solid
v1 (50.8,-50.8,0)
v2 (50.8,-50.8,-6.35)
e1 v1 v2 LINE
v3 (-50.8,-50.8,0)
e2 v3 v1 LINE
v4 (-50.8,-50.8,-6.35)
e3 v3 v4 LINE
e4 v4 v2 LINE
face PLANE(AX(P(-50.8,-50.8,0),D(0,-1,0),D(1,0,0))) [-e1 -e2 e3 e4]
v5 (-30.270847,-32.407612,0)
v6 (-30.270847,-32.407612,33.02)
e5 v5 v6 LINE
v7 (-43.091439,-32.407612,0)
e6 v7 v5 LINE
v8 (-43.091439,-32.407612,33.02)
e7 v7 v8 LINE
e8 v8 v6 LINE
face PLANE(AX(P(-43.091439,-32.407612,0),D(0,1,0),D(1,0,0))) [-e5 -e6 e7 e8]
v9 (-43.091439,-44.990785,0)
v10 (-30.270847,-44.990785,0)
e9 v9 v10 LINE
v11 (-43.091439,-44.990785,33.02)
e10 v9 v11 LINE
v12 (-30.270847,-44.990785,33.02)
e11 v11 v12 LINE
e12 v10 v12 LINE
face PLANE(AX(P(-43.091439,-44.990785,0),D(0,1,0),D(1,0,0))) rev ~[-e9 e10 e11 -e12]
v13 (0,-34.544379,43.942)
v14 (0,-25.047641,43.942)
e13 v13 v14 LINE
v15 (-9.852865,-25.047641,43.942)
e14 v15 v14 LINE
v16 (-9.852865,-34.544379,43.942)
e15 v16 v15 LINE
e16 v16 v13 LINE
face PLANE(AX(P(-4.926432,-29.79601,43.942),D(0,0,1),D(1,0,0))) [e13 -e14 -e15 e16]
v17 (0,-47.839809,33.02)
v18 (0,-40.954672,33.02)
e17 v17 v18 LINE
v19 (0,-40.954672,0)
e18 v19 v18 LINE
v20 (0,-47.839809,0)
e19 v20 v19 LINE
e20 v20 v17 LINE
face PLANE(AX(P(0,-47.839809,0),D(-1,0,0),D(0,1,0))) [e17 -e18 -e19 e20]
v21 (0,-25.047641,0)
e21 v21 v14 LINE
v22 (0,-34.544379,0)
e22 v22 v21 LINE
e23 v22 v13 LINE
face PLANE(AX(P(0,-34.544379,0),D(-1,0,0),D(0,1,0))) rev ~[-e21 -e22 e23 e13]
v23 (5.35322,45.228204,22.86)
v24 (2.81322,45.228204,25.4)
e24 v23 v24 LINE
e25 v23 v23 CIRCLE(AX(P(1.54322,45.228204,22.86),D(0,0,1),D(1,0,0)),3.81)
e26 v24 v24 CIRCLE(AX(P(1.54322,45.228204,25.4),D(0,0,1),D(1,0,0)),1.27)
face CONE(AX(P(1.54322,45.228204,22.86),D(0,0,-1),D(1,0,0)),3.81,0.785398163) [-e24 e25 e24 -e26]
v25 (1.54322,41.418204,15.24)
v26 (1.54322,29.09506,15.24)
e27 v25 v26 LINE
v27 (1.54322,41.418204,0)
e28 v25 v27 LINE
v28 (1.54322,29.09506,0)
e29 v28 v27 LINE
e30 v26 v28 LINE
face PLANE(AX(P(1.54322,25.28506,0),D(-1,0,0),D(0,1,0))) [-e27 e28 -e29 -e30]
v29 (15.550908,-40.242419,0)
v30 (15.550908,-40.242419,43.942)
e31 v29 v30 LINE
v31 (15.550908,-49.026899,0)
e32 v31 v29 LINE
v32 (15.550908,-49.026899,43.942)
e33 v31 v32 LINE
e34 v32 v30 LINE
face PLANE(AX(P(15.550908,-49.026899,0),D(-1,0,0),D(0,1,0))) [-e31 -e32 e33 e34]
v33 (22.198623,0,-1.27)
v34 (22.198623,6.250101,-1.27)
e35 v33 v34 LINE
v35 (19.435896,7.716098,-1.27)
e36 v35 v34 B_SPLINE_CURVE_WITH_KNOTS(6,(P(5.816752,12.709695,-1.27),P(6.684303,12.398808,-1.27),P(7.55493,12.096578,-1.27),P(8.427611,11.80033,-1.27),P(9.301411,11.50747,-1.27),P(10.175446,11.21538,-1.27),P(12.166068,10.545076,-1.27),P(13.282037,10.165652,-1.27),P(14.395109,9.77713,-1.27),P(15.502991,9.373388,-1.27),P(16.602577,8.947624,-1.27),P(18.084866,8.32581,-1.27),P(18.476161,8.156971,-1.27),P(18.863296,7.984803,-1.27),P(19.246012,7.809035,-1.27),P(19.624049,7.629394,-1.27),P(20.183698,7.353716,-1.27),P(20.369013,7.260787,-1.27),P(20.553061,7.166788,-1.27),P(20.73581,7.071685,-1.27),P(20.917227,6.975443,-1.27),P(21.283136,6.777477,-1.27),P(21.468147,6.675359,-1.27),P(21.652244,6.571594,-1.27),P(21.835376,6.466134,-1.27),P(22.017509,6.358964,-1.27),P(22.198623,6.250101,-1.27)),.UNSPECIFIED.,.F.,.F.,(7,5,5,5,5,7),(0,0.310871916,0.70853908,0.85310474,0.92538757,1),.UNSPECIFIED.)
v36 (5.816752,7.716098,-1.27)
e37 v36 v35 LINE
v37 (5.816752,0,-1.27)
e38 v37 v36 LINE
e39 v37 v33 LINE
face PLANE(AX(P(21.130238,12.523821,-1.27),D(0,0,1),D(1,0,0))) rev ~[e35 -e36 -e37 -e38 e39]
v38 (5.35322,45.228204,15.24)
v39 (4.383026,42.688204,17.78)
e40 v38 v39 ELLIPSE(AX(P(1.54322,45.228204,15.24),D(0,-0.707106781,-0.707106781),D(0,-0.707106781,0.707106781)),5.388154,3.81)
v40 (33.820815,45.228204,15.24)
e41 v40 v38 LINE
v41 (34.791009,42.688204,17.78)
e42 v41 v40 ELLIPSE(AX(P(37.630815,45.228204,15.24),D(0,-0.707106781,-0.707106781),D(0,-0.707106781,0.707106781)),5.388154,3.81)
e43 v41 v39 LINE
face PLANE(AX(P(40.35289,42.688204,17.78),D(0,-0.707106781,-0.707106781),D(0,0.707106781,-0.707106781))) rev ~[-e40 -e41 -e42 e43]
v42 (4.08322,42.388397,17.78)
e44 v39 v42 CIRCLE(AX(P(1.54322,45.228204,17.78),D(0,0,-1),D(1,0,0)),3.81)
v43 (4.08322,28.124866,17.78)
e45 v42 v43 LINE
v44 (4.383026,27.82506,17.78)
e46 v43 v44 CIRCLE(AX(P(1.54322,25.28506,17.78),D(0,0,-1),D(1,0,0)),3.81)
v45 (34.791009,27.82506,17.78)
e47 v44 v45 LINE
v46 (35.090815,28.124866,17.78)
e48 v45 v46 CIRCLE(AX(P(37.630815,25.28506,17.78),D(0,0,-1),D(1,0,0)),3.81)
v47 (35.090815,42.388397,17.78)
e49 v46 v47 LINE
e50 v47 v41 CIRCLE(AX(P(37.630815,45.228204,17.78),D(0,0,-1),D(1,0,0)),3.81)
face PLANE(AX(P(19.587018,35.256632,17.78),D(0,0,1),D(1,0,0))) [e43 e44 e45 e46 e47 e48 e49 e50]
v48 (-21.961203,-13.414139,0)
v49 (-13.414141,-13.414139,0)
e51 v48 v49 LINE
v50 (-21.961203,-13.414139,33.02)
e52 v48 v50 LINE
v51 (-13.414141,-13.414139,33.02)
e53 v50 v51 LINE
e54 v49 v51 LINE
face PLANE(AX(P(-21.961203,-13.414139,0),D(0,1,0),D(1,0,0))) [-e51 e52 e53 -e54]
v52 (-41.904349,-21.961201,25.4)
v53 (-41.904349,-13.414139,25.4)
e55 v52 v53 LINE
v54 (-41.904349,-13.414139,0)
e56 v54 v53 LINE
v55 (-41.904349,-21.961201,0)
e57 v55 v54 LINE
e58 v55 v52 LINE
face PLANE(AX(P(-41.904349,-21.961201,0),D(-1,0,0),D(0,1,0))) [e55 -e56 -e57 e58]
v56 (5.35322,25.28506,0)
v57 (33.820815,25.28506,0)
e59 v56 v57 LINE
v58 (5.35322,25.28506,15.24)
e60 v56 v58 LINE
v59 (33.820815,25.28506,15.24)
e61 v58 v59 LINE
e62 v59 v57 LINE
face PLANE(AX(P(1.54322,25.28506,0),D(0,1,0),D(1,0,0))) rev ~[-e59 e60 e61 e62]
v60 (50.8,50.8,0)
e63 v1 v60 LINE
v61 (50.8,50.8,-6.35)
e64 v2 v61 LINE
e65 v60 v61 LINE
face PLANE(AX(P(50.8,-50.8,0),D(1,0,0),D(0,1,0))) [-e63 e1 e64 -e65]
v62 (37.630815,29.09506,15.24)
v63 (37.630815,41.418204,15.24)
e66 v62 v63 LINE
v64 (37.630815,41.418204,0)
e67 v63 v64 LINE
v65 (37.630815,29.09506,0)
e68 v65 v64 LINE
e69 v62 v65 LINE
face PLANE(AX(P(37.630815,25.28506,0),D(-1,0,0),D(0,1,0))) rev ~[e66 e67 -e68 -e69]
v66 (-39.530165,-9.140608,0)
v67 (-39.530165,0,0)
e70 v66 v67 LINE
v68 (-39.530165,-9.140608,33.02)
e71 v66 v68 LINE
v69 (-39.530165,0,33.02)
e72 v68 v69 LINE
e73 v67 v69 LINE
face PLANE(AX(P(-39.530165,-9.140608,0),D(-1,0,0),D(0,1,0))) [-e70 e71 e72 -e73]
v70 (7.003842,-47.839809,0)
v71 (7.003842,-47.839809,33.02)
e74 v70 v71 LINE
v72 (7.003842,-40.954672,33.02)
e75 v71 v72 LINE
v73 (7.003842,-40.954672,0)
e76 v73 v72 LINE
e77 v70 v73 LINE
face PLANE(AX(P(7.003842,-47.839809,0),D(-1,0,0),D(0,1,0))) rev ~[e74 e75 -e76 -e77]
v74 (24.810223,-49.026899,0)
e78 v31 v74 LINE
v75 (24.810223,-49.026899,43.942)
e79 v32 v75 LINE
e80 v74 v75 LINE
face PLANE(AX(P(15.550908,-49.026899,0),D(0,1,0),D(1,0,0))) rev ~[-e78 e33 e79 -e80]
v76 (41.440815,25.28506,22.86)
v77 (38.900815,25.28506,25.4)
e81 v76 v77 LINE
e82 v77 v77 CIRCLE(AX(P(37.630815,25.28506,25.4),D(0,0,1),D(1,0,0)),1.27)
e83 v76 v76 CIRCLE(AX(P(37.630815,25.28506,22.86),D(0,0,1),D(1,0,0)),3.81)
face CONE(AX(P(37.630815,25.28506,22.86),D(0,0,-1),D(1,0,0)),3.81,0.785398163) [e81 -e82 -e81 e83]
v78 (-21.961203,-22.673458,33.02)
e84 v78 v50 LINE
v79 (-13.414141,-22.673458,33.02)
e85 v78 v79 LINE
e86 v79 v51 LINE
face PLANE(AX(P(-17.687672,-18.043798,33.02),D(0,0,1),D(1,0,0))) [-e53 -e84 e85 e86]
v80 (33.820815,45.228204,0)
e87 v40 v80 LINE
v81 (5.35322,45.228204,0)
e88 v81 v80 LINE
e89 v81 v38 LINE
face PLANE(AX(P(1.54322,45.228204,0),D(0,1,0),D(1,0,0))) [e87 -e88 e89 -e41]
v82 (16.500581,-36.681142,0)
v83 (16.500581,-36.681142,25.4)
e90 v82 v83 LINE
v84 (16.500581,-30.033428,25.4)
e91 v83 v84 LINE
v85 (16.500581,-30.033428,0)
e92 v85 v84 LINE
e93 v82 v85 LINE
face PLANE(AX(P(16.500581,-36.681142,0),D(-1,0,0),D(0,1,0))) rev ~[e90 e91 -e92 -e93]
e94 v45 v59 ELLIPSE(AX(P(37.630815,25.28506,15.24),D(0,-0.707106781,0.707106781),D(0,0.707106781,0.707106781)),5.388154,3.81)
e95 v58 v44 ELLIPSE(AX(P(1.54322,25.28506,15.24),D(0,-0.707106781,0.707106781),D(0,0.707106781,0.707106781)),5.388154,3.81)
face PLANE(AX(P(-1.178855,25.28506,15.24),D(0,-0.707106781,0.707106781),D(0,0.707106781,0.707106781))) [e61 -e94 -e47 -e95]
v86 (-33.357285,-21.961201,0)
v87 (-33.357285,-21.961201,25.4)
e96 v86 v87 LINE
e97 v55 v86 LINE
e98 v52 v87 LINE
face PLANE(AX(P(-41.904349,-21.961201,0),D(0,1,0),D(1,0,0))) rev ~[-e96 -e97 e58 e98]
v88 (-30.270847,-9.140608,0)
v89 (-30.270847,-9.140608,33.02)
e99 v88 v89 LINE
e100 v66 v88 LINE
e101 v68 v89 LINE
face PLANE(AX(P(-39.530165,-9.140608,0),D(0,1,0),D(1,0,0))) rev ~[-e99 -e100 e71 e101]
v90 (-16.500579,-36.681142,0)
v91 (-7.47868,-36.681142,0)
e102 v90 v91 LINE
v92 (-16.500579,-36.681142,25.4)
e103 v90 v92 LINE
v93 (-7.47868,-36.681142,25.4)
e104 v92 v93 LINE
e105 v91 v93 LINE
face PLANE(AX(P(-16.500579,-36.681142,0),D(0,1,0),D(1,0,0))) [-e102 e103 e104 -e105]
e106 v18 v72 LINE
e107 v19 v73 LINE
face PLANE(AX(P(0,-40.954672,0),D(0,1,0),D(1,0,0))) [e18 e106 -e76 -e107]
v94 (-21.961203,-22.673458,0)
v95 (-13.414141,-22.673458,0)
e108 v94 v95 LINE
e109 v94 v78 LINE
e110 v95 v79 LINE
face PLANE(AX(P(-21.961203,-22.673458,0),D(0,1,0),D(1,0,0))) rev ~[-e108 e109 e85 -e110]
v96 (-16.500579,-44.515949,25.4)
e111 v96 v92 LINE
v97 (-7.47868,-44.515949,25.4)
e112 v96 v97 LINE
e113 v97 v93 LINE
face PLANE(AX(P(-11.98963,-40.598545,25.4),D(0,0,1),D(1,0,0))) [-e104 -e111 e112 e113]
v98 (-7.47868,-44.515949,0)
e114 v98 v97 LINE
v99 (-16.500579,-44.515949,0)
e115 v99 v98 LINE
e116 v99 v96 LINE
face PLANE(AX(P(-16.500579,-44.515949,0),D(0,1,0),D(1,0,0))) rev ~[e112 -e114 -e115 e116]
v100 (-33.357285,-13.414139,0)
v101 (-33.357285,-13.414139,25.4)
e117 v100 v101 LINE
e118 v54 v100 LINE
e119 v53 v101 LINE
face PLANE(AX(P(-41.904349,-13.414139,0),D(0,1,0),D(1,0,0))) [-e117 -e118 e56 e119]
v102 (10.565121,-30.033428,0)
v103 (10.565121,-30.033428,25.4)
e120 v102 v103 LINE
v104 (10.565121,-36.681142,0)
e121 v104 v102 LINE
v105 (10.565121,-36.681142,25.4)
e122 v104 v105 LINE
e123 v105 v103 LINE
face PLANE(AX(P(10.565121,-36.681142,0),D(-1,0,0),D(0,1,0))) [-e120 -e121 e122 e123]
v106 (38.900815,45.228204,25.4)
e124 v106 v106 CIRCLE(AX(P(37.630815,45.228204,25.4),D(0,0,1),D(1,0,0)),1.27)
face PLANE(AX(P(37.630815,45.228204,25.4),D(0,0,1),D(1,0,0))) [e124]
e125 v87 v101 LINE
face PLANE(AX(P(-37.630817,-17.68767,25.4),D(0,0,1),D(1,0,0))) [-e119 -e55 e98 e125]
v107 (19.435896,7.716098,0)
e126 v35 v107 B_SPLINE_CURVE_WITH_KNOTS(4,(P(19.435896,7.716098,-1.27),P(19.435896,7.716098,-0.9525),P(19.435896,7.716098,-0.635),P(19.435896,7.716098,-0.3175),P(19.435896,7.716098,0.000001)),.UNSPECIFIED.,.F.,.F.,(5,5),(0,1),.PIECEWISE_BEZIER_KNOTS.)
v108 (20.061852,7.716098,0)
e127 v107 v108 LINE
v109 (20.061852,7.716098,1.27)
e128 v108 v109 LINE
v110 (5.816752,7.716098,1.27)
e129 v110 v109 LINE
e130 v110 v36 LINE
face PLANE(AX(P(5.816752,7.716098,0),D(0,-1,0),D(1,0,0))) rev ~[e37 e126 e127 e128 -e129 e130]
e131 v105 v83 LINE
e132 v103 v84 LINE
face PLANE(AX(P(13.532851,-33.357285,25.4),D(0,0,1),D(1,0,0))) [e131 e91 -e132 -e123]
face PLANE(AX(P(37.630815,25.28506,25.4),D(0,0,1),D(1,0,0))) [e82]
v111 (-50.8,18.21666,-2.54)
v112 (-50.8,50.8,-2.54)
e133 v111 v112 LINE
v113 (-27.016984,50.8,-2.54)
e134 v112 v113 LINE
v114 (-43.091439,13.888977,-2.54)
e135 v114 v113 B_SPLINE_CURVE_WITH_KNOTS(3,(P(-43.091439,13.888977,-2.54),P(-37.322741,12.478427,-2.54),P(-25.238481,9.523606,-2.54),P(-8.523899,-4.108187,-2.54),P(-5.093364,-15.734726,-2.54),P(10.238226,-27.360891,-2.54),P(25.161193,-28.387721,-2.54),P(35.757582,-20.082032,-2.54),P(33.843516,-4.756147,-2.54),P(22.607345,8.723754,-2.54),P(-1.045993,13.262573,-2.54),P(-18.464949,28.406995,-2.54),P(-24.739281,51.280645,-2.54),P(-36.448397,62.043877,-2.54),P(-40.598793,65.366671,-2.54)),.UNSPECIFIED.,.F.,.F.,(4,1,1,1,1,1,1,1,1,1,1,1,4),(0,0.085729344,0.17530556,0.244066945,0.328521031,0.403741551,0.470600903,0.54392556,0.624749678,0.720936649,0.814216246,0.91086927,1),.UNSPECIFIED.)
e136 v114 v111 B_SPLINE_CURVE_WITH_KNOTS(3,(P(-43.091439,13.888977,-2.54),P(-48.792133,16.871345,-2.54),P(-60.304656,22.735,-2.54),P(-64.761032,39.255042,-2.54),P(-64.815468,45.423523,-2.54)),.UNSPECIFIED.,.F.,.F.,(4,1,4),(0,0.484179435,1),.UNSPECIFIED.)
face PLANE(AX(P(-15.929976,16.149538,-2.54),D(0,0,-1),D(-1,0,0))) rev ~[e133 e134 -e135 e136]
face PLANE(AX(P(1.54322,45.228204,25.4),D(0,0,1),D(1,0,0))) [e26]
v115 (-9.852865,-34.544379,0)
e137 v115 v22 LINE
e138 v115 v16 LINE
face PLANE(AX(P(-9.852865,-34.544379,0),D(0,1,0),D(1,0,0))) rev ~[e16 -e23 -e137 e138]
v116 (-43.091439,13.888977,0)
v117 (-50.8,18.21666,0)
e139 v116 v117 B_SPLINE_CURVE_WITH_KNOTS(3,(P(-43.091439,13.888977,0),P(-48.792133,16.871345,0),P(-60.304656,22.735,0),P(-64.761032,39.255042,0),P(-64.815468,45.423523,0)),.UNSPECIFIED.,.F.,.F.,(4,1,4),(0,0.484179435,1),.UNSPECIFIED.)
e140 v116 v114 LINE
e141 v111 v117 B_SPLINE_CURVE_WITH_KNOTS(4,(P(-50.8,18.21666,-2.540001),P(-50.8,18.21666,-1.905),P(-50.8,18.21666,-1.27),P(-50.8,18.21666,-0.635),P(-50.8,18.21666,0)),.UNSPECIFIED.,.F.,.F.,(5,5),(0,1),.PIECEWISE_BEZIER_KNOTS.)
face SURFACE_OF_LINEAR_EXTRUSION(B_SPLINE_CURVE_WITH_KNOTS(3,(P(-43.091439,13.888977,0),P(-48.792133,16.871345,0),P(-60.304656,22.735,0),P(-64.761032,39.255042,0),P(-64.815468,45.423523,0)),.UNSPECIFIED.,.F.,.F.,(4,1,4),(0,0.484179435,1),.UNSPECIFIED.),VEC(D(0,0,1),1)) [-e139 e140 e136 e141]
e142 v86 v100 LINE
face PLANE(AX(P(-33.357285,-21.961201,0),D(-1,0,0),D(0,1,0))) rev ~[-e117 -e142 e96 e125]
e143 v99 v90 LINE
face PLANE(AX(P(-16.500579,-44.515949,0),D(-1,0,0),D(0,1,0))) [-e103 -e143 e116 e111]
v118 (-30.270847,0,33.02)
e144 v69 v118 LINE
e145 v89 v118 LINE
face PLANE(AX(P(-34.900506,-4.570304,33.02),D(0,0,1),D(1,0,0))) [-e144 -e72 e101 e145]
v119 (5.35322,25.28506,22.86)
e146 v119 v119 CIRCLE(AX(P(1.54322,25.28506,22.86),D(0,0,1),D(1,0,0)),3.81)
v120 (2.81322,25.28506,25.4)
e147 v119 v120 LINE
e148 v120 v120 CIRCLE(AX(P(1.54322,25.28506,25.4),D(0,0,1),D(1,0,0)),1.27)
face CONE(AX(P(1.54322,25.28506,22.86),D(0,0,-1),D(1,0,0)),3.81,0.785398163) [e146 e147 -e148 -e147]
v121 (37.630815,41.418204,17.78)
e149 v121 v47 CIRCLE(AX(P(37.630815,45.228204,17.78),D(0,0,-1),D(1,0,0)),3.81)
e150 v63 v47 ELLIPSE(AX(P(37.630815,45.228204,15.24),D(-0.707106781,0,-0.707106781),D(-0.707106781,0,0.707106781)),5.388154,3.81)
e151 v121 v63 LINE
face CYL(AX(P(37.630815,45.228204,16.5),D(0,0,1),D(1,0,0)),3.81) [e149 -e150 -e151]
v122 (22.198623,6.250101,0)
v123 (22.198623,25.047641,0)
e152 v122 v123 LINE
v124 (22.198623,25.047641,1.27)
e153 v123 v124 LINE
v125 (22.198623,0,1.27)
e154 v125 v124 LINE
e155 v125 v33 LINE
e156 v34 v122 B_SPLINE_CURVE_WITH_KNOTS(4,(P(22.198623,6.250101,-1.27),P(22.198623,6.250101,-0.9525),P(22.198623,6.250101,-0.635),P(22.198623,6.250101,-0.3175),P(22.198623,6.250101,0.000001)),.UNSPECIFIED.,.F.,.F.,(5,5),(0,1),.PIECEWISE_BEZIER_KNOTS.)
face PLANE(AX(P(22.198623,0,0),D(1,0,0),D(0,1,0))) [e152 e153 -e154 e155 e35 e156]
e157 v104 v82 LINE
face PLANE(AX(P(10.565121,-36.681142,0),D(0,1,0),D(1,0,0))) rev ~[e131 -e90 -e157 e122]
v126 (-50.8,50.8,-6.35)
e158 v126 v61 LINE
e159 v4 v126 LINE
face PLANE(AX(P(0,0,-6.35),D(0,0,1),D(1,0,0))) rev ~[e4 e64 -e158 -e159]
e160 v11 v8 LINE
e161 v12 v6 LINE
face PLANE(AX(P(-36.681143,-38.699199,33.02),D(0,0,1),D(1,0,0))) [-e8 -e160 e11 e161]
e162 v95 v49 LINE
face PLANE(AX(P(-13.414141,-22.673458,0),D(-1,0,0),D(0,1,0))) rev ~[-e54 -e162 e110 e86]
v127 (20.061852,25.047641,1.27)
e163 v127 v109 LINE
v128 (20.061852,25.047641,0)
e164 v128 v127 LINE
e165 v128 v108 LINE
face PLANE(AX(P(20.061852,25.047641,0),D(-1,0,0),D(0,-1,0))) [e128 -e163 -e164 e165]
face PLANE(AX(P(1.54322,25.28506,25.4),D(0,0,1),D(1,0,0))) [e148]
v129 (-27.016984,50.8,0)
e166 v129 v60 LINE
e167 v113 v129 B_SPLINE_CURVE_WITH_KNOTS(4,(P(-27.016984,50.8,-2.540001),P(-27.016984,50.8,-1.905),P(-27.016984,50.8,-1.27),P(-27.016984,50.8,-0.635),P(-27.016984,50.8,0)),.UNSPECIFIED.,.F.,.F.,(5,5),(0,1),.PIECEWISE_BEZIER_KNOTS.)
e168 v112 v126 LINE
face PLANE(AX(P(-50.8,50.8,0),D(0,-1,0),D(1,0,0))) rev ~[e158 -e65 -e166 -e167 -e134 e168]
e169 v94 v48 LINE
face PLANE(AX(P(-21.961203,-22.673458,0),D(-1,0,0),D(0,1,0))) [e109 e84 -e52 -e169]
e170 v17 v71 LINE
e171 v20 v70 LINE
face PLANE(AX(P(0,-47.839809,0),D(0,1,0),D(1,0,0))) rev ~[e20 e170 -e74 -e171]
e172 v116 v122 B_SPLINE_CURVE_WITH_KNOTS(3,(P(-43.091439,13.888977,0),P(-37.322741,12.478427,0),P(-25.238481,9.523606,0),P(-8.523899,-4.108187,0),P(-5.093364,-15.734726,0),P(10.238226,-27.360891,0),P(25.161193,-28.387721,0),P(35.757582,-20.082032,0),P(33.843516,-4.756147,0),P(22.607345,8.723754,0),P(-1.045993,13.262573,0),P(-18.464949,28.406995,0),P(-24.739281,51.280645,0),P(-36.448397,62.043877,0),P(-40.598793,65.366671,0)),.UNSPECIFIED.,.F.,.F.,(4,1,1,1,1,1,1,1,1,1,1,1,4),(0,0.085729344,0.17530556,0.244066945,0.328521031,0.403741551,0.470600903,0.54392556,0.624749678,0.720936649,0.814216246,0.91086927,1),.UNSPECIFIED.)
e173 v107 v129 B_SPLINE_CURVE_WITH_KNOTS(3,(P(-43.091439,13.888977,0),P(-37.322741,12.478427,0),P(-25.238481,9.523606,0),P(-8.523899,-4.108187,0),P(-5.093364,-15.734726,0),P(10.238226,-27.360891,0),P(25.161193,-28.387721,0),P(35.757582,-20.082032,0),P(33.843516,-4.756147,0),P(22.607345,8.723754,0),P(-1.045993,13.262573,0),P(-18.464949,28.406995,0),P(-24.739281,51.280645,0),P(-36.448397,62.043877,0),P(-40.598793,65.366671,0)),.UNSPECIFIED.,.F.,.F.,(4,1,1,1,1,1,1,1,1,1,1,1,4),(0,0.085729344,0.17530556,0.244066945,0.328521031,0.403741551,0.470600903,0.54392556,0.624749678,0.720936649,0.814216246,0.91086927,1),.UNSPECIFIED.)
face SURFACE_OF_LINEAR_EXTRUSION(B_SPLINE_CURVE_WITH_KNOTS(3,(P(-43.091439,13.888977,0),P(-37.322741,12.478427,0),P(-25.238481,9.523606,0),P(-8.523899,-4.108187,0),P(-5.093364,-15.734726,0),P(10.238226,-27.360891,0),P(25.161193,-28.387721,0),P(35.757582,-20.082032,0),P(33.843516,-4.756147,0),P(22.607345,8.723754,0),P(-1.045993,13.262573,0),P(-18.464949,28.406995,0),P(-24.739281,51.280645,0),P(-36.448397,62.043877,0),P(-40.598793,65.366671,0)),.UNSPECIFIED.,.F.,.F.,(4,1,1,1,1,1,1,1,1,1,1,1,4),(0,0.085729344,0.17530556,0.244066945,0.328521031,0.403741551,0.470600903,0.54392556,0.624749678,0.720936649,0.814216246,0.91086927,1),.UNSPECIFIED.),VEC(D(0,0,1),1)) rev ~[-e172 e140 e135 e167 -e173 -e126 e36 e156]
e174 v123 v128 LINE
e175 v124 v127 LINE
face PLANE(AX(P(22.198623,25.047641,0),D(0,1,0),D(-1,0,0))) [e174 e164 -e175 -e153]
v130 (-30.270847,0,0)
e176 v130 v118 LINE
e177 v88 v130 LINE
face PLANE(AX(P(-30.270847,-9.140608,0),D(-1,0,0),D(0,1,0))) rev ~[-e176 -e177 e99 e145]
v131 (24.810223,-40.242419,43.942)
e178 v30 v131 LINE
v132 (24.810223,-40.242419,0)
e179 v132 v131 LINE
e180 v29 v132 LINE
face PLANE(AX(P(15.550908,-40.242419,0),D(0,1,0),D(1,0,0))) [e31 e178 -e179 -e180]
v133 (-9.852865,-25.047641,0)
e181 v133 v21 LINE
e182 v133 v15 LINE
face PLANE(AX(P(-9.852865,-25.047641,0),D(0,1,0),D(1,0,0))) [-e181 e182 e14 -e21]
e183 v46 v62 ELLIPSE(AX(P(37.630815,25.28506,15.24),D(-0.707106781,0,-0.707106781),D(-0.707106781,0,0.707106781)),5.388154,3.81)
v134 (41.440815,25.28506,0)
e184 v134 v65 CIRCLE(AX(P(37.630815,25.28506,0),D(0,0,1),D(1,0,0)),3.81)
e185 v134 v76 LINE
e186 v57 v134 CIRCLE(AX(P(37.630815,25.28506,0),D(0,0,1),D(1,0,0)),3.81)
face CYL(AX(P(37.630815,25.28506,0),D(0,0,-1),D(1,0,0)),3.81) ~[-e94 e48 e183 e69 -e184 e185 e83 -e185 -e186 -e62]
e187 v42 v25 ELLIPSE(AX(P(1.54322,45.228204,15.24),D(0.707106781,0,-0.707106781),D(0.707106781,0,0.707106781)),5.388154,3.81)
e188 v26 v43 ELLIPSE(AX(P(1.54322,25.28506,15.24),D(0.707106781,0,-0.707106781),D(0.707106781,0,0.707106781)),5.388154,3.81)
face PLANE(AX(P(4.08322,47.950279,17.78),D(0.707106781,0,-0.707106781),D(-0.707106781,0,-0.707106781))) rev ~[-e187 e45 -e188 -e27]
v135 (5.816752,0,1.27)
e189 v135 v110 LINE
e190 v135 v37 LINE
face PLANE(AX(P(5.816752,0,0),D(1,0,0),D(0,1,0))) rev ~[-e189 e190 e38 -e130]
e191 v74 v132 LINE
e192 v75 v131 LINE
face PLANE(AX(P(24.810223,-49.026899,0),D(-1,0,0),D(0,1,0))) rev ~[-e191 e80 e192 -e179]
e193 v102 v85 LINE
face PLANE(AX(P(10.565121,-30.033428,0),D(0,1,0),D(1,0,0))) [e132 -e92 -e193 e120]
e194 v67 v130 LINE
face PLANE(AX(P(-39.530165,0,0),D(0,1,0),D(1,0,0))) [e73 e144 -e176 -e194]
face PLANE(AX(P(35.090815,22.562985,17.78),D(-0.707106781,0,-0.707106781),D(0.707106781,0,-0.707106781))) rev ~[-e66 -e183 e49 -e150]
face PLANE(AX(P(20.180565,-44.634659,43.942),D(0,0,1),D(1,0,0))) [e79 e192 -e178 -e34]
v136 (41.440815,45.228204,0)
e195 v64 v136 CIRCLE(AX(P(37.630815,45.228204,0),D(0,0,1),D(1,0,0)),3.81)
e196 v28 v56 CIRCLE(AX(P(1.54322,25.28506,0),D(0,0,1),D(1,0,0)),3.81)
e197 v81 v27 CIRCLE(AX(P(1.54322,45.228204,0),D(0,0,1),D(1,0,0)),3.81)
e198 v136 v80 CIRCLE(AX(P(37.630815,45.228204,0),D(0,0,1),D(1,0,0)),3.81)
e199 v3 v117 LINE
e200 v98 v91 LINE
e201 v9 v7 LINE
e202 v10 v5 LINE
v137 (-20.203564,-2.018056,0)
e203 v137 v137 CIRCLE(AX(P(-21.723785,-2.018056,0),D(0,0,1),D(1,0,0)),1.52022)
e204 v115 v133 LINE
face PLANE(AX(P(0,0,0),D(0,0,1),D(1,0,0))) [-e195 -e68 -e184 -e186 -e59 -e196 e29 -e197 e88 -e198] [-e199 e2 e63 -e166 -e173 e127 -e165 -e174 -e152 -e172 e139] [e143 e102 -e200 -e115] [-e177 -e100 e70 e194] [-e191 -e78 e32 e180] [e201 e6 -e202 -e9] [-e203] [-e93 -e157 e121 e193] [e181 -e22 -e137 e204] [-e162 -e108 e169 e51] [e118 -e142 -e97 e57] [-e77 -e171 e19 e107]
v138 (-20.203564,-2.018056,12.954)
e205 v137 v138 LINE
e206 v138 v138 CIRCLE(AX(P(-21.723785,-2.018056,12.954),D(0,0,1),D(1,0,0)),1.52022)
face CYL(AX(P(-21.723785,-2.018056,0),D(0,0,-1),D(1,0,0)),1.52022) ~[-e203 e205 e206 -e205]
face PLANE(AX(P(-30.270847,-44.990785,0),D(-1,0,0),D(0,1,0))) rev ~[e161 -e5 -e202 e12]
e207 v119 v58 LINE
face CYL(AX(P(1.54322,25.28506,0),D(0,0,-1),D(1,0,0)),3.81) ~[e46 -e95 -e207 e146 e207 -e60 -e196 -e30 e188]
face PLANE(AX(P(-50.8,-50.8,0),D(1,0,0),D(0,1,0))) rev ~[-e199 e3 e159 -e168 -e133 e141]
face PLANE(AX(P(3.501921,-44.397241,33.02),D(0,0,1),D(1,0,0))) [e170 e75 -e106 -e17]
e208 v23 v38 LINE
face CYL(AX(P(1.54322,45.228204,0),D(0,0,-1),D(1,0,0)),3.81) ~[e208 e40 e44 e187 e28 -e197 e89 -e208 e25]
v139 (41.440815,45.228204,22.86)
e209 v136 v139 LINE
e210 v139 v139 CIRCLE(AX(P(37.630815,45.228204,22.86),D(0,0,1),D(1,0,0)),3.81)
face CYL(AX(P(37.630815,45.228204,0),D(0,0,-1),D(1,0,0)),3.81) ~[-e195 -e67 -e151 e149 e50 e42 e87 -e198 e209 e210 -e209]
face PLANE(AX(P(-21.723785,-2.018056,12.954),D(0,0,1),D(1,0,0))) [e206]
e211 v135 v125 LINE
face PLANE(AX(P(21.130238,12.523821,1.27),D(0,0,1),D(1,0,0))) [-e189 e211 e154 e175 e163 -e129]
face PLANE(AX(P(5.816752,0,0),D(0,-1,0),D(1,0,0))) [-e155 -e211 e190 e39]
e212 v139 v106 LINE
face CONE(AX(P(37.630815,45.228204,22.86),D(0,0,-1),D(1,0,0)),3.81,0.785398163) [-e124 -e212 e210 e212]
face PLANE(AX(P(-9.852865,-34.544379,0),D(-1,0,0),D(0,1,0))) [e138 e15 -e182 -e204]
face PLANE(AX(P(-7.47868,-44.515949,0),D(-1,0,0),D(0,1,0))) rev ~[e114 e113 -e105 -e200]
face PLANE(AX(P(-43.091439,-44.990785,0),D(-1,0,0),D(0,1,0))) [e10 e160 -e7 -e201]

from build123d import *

# Parameters (mm, degrees)
F0_W          = 101.6
F0_H          = 101.6
F1_DEPTH      = 6.35
F3_DEPTH      = 2.54
F4_W          = 8.5470639169
F4_H          = 8.5470620543
F4_W_2        = 9.0218987316
F4_H_2        = 7.8348070383
F4_W_3        = 5.9354603291
F4_H_3        = 6.6477134824
F10_DEPTH     = 25.4
F5_W          = 9.2593189329
F5_H          = 9.1406079009
F5_W_2        = 8.5470620543
F5_H_2        = 9.2593189329
F5_W_3        = 12.8205921501
F5_H_3        = 12.5831738114
F5_W_4        = 7.0038423873
F5_H_4        = 6.885137409
F11_DEPTH     = 33.02
F6_W          = 9.8528647795
F6_H          = 9.4967372715
F6_W_2        = 9.2593152076
F6_H_2        = 8.7844803929
F12_DEPTH     = 43.942
F7_R          = 1.5202204641
F13_DEPTH     = 12.954
F8_W          = 36.0875949264
F8_H          = 19.9431441724
F14_DEPTH     = 17.78
F15_R         = 3.81
F16_DEPTH     = 25.4
F17_SIZE      = 2.54
F18_T4_DEPTH  = 25.3872937513
F18_S5_R      = 3.81
F18_T6_DEPTH  = 14
F18_S7_R      = 3.81
F18_T8_DEPTH  = 14
F18_T12_DEPTH = 41.5317445052
F18_S13_R     = 3.81
F18_T14_DEPTH = 22
F18_S15_R     = 3.81
F18_T16_DEPTH = 22
F18_T20_DEPTH = 25.3872937513
F18_S21_R     = 3.81
F18_T22_DEPTH = 14
F18_S23_R     = 3.81
F18_T24_DEPTH = 14
F18_T28_DEPTH = 41.5317445052
F18_S29_R     = 3.81
F18_T30_DEPTH = 22
F18_S31_R     = 3.81
F18_T32_DEPTH = 22
F9_W          = 14.245100785
F9_H          = 7.716097869
F19_DEPTH     = 1.27


# Not quite as in the source:
# - a fillet or chamfer that OpenCascade refuses, or shapes differently, is made with other operations: its cross-section is extruded or revolved along the edge and cut away or added


with BuildPart() as f1:
    # F0 (on Top) → F1 (new body)
    with BuildSketch(Plane.XY):
        Rectangle(F0_W, F0_H)
    extrude(amount=-F1_DEPTH)

    # F2 (on Top) → F3 (cut)
    with BuildSketch(Plane.XY):
        with BuildLine():
            add(Edge.make_bspline(
                [(-43.0914387107, 13.8889765367), (-48.792132623, 16.8713450612), (-60.3046561951, 22.7349998179), (-64.7610317916, 39.255042485), (-64.8154675332, 45.423523183)],
                knots=[0, 0, 0, 0, 0.4841794351, 1, 1, 1, 1], degree=3))
            add(Edge.make_bspline(
                [(-43.0914387107, 13.8889765367), (-37.3227409256, 12.4784266372), (-25.238481151, 9.5236064613), (-8.5238992218, -4.1081865608), (-5.0933643721, -15.7347262944), (10.2382263796, -27.360890695), (25.1611930237, -28.3877213638), (35.757581674, -20.0820321549), (33.8435161562, -4.7561465103), (22.6073453238, 8.7237537482), (-1.0459930134, 13.2625730637), (-18.464949103, 28.4069952294), (-24.7392805682, 51.2806449877), (-36.4483970668, 62.0438769385), (-40.598793265, 65.3666710807)],
                knots=[0, 0, 0, 0, 0.0857293443, 0.1753055598, 0.2440669449, 0.3285210308, 0.4037415508, 0.4706009031, 0.5439255605, 0.6247496782, 0.7209366486, 0.814216246, 0.9108692703, 1, 1, 1, 1], degree=3))
            Line((-40.598793265, 65.3666710807), (-64.8154675332, 45.423523183))
        make_face()
    extrude(amount=-F3_DEPTH, mode=Mode.SUBTRACT)

    # F4 (on Top) → F10 (join)
    with BuildSketch(Plane.XY):
        with Locations((-37.6308169216, -17.6876699552)):
            Rectangle(F4_W, F4_H)
        with Locations((-11.9896298274, -40.5985452235)):
            Rectangle(F4_W_2, F4_H_2)
        with Locations((13.5328508914, -33.3572849631)):
            Rectangle(F4_W_3, F4_H_3)
    extrude(amount=F10_DEPTH)

    # F5 (on Top) → F11 (join)
    with BuildSketch(Plane.XY):
        with Locations((-34.900506027, -4.5703039505)):
            Rectangle(F5_W, F5_H)
        with Locations((-17.6876718178, -18.0437983945)):
            Rectangle(F5_W_2, F5_H_2)
        with Locations((-36.6811426356, -38.6991985142)):
            Rectangle(F5_W_3, F5_H_3)
        with Locations((3.5019211937, -44.3972405046)):
            Rectangle(F5_W_4, F5_H_4)
    extrude(amount=F11_DEPTH)

    # F6 (on Top) → F12 (join)
    with BuildSketch(Plane.XY):
        with Locations((-4.9264323898, -29.7960098833)):
            Rectangle(F6_W, F6_H)
        with Locations((20.1805653051, -44.6346588433)):
            Rectangle(F6_W_2, F6_H_2)
    extrude(amount=F12_DEPTH)

    # F7 (on Top) → F13 (join)
    with BuildSketch(Plane.XY):
        with Locations((-21.7237845063, -2.0180563442)):
            Circle(F7_R)
    extrude(amount=F13_DEPTH)

    # F8 (on Top) → F14 (join)
    with BuildSketch(Plane.XY):
        with Locations((19.5870175958, 35.2566316724)):
            Rectangle(F8_W, F8_H)
    extrude(amount=F14_DEPTH)

    # F15 (on Top) → F16 (join)
    with BuildSketch(Plane.XY):
        with Locations((1.5432201326, 45.2282037586)):
            Circle(F15_R)
        with Locations((37.6308150589, 45.2282037586)):
            Circle(F15_R)
        with Locations((37.6308150589, 25.2850595862)):
            Circle(F15_R)
        with Locations((1.5432201326, 25.2850595862)):
            Circle(F15_R)
    extrude(amount=F16_DEPTH)

    # F17
    f17_edges = [f1.edges().sort_by_distance(p)[0] for p in [
        (-2.26678, 45.228204, 25.4),
        (-2.26678, 25.28506, 25.4),
        (33.820815, 25.28506, 25.4),
        (33.820815, 45.228204, 25.4),
    ]]
    chamfer(f17_edges, length=F17_SIZE)

    # F18: chamfer of 2.54 on 4 edges, made by hand


with BuildPart() as f18_tool2:
    # F18_s3 → F18_t4 (new body)
    with BuildSketch(Plane.XZ.offset(-47.950278548)):
        Polygon((4.0832201326, 17.78), (1.5432201326, 15.24), (1.5432201326, 17.78), align=None)
    extrude(amount=F18_T4_DEPTH)

    # F18_s5 → F18_t6 (cut, symmetric)
    with BuildSketch(Plane.XY.offset(16.5)):
        with Locations((1.5432201326, 25.2850595862)):
            Circle(F18_S5_R)
    extrude(amount=F18_T6_DEPTH, both=True, mode=Mode.SUBTRACT)

    # F18_s7 → F18_t8 (cut, symmetric)
    with BuildSketch(Plane.XY.offset(16.5)):
        with Locations((1.5432201326, 45.2282037586)):
            Circle(F18_S7_R)
    extrude(amount=F18_T8_DEPTH, both=True, mode=Mode.SUBTRACT)


with BuildPart() as f1_1:
    add(f1.part)

    # F18_t1: cut F18_tool2
    add(f18_tool2.part, mode=Mode.SUBTRACT)


with BuildPart() as f18_tool10:
    # F18_s11 → F18_t12 (new body)
    with BuildSketch(Plane.YZ.offset(-1.1788546568)):
        Polygon((25.2850595862, 15.24), (27.8250595862, 17.78), (25.2850595862, 17.78), align=None)
    extrude(amount=F18_T12_DEPTH)

    # F18_s13 → F18_t14 (cut, symmetric)
    with BuildSketch(Plane.XY.offset(16.5)):
        with Locations((37.6308150589, 25.2850595862)):
            Circle(F18_S13_R)
    extrude(amount=F18_T14_DEPTH, both=True, mode=Mode.SUBTRACT)

    # F18_s15 → F18_t16 (cut, symmetric)
    with BuildSketch(Plane.XY.offset(16.5)):
        with Locations((1.5432201326, 25.2850595862)):
            Circle(F18_S15_R)
    extrude(amount=F18_T16_DEPTH, both=True, mode=Mode.SUBTRACT)


with BuildPart() as f1_2:
    add(f1_1.part)

    # F18_t9: cut F18_tool10
    add(f18_tool10.part, mode=Mode.SUBTRACT)


with BuildPart() as f18_tool18:
    # F18_s19 → F18_t20 (new body)
    with BuildSketch(Plane.XZ.offset(-22.5629847967)):
        Polygon((35.0908150589, 17.78), (37.6308150589, 15.24), (37.6308150589, 17.78), align=None)
    extrude(amount=-F18_T20_DEPTH)

    # F18_s21 → F18_t22 (cut, symmetric)
    with BuildSketch(Plane.XY.offset(16.5)):
        with Locations((37.6308150589, 25.2850595862)):
            Circle(F18_S21_R)
    extrude(amount=F18_T22_DEPTH, both=True, mode=Mode.SUBTRACT)

    # F18_s23 → F18_t24 (cut, symmetric)
    with BuildSketch(Plane.XY.offset(16.5)):
        with Locations((37.6308150589, 45.2282037586)):
            Circle(F18_S23_R)
    extrude(amount=F18_T24_DEPTH, both=True, mode=Mode.SUBTRACT)


with BuildPart() as f1_3:
    add(f1_2.part)

    # F18_t17: cut F18_tool18
    add(f18_tool18.part, mode=Mode.SUBTRACT)


with BuildPart() as f18_tool26:
    # F18_s27 → F18_t28 (new body)
    with BuildSketch(Plane.YZ.offset(40.3528898484)):
        Polygon((42.6882037586, 17.78), (45.2282037586, 15.24), (45.2282037586, 17.78), align=None)
    extrude(amount=-F18_T28_DEPTH)

    # F18_s29 → F18_t30 (cut, symmetric)
    with BuildSketch(Plane.XY.offset(16.5)):
        with Locations((1.5432201326, 45.2282037586)):
            Circle(F18_S29_R)
    extrude(amount=F18_T30_DEPTH, both=True, mode=Mode.SUBTRACT)

    # F18_s31 → F18_t32 (cut, symmetric)
    with BuildSketch(Plane.XY.offset(16.5)):
        with Locations((37.6308150589, 45.2282037586)):
            Circle(F18_S31_R)
    extrude(amount=F18_T32_DEPTH, both=True, mode=Mode.SUBTRACT)


with BuildPart() as f1_4:
    add(f1_3.part)

    # F18_t25: cut F18_tool26
    add(f18_tool26.part, mode=Mode.SUBTRACT)

    # F9 (on Top) → F19 (join, symmetric)
    with BuildSketch(Plane.XY):
        Polygon((22.1986230463, 0), (22.1986230463, 25.0476412475), (20.0618524104, 25.0476412475), (20.0618524104, 7.716097869), (20.0618524104, 0), align=None)
        with Locations((12.9393020179, 3.8580489345)):
            Rectangle(F9_W, F9_H)
    extrude(amount=F19_DEPTH, both=True)


solid = f1_4.part
